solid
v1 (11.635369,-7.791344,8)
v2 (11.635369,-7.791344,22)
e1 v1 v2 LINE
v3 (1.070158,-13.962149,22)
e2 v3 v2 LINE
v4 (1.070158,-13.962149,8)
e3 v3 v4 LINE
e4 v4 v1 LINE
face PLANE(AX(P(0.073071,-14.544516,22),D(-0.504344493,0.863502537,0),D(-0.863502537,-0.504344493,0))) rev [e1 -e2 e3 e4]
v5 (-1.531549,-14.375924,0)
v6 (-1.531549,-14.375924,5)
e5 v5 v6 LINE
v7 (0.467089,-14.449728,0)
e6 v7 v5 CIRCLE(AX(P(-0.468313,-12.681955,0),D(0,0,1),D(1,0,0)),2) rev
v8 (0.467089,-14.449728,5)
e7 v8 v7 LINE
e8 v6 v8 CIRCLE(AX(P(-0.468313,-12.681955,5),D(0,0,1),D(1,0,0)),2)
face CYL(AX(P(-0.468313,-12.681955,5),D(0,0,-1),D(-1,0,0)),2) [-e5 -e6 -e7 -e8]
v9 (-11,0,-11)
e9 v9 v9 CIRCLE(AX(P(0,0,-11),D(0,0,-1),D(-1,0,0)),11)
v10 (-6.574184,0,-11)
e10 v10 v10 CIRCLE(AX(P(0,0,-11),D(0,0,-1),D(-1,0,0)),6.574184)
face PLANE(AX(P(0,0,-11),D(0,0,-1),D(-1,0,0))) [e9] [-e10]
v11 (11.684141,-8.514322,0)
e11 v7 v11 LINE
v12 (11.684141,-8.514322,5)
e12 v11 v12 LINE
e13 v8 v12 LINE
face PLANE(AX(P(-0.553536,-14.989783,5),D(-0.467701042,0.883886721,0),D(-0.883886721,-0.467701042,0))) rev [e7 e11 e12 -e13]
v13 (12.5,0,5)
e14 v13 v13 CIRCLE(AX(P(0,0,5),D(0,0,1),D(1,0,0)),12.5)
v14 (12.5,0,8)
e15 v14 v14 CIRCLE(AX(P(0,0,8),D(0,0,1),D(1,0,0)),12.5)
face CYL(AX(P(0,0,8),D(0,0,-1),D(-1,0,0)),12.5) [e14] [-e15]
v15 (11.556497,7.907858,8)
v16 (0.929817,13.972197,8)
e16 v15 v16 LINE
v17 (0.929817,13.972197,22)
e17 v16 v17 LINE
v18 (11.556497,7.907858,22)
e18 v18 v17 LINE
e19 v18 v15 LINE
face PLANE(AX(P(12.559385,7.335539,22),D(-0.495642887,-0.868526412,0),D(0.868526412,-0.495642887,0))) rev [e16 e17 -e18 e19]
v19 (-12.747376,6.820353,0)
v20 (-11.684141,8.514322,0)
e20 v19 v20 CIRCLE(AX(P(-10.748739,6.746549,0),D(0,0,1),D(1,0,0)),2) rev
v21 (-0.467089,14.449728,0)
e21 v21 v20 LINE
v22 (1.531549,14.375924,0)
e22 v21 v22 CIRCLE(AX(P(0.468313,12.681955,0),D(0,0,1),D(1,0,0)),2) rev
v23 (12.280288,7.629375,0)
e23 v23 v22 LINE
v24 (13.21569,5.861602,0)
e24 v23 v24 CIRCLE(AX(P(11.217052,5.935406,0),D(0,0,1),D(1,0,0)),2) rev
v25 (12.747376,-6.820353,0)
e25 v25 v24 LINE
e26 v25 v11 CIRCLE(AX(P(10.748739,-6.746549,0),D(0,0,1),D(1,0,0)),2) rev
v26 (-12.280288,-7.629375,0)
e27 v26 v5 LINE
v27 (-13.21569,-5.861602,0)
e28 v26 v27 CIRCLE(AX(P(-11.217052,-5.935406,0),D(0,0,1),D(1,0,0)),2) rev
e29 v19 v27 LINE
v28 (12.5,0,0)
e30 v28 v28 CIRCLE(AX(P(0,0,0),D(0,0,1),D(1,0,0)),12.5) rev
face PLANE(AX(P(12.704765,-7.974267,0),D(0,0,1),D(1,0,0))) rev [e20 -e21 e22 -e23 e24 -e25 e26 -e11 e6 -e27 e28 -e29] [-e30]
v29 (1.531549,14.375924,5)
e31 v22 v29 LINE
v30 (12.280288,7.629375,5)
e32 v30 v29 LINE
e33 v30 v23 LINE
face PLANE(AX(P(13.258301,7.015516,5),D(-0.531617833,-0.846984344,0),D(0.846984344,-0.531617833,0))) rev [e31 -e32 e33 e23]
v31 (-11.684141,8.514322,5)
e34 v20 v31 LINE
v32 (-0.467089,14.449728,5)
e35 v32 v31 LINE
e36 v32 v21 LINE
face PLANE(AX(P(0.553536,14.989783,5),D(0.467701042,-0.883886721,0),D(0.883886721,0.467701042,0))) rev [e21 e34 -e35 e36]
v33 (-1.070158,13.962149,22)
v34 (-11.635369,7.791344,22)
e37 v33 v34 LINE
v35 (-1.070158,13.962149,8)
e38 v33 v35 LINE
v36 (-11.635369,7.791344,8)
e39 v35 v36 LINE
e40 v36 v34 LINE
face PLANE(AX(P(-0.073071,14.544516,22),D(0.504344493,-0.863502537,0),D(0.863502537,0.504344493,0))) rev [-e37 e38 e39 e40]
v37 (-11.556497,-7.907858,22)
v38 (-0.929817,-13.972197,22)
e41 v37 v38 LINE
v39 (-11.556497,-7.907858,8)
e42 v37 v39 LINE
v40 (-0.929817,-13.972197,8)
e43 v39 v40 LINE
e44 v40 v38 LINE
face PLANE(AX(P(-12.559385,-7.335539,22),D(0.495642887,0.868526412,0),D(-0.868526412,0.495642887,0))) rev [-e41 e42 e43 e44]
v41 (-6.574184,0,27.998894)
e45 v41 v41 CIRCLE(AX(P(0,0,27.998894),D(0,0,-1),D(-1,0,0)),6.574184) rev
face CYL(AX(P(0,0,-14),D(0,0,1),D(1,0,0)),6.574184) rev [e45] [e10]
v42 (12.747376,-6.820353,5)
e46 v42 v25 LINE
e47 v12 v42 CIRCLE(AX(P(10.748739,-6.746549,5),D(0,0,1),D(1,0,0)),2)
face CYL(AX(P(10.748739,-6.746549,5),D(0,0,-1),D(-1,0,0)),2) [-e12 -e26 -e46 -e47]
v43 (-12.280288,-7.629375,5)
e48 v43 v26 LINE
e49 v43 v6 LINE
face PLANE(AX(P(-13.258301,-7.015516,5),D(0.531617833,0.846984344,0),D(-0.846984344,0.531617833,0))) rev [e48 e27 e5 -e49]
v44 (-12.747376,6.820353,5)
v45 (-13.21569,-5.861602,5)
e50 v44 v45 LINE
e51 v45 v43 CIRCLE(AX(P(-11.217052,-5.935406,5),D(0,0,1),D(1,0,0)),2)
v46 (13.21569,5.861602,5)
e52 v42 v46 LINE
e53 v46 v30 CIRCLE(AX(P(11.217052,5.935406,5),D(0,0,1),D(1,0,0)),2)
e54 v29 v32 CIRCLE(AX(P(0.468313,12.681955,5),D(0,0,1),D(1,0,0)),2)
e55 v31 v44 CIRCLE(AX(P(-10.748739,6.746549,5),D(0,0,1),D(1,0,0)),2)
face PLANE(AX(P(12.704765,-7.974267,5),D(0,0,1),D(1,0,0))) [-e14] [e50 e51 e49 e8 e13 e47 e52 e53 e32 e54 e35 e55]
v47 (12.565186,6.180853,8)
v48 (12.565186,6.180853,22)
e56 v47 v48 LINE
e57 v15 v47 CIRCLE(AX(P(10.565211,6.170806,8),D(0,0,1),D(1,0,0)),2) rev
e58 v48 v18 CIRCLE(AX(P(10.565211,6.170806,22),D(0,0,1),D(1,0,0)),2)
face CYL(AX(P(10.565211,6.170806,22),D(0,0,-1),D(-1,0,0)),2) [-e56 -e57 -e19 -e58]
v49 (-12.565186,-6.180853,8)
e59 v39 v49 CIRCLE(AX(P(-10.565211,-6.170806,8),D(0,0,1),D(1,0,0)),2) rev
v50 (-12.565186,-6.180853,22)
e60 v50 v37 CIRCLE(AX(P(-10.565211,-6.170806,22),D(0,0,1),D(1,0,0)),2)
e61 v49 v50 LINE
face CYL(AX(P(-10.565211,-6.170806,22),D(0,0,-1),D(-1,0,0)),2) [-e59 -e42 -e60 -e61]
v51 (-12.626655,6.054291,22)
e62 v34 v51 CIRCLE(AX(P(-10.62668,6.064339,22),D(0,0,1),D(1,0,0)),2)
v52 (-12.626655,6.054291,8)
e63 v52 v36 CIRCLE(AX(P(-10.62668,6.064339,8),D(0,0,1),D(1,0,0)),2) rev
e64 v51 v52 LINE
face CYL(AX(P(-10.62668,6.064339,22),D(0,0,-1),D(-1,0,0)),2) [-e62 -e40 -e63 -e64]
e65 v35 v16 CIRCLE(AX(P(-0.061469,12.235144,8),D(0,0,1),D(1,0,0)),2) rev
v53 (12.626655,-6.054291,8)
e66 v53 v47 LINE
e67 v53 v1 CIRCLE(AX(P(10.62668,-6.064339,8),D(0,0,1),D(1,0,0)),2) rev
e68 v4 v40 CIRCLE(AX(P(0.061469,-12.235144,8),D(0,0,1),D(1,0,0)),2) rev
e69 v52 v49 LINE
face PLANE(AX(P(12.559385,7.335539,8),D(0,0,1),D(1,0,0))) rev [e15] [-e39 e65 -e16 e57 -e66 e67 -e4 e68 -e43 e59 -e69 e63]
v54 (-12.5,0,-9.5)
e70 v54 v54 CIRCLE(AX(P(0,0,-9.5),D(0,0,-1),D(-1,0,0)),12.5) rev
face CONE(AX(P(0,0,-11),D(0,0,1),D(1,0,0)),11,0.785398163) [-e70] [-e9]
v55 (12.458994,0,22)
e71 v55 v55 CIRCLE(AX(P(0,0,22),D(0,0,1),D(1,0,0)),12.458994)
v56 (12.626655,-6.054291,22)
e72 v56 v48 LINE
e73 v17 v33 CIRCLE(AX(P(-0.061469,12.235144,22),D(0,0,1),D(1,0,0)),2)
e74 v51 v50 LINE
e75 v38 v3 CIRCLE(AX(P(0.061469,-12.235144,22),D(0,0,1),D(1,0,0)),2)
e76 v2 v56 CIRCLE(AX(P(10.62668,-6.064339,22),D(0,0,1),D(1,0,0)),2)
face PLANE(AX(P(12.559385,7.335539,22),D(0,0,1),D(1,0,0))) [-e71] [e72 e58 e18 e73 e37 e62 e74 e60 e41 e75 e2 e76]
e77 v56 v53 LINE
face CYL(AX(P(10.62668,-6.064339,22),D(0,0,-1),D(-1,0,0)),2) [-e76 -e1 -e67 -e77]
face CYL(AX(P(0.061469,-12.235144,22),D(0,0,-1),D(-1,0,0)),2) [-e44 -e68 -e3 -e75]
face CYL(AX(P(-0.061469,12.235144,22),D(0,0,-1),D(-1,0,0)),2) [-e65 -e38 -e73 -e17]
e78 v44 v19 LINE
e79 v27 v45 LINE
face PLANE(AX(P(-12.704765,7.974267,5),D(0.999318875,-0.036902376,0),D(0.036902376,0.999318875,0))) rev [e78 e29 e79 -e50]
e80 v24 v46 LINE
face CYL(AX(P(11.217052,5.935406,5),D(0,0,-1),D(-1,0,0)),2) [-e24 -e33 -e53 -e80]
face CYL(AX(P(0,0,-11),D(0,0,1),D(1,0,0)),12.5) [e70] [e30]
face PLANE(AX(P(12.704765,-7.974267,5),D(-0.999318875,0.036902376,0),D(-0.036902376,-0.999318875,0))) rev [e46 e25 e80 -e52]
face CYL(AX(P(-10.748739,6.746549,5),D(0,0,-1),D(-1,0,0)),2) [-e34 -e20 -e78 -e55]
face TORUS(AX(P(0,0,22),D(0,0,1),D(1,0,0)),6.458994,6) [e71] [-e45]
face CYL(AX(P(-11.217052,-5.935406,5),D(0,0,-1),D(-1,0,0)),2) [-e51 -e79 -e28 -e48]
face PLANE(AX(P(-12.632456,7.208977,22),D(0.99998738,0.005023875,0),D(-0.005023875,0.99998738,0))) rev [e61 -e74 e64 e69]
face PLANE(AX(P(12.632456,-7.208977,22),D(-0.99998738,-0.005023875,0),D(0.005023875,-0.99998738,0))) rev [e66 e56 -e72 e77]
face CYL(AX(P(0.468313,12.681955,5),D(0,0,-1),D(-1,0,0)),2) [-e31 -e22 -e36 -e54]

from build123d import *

# Parameters (mm, degrees)
EXTRUDE_1_DEPTH     = 5
SKETCH_3_R          = 12.5
EXTRUDE_2_DEPTH     = 11
CHAMFER_1_SIZE      = 1.5
EXTRUDE_START       = 3
SKETCH_4_R          = 12.5
EXTRUDE_3_DEPTH     = 3
EXTRUDE_4_DEPTH     = 14
SKETCH_6_R          = 12.458994032
EXTRUDE_5_DEPTH     = 6
FILLET_1_R          = 6
SKETCH_7_R          = 6.574183754
CUT_EXTRUDE_1_DEPTH = 42
FILLET_2_R          = 2


with BuildPart() as part:
    # Эскиз2 → Бобышка-Вытянуть1 (new body)
    with BuildSketch(Plane.XY):
        Polygon((12.704765165, -7.974267497), (13.258300811, 7.015515633), (0.553535647, 14.98978313), (-12.704765165, 7.974267497), (-13.258300811, -7.015515633), (-0.553535647, -14.98978313), align=None)
    extrude(amount=EXTRUDE_1_DEPTH)

    # Эскиз3 → Бобышка-Вытянуть2 (add)
    with BuildSketch(Plane(origin=(0, 0, 0), x_dir=(-1, 0, 0), z_dir=(0, 0, -1))):
        with Locations(Location((0, 0, 0), (0, 0, 180))):
            Circle(SKETCH_3_R)
    extrude(amount=EXTRUDE_2_DEPTH)

    # Фаска1
    chamfer_1_edges = [part.edges().sort_by_distance(p)[0] for p in [
        (-12.5, 0, -11),
    ]]
    chamfer(chamfer_1_edges, length=CHAMFER_1_SIZE)

    # Эскиз4 → Бобышка-Вытянуть3 (add)
    with BuildSketch(Plane.XY.offset(5).offset(EXTRUDE_START)):
        Circle(SKETCH_4_R)
    extrude(amount=-EXTRUDE_3_DEPTH)

    # Эскиз5 → Бобышка-Вытянуть4 (add)
    with BuildSketch(Plane.XY.offset(8)):
        Polygon((12.559385181, 7.335539252), (-0.073070753, 14.544516248), (-12.632455933, 7.208976996), (-12.559385181, -7.335539252), (0.073070753, -14.544516248), (12.632455933, -7.208976996), align=None)
    extrude(amount=EXTRUDE_4_DEPTH)

    # Эскиз6 → Бобышка-Вытянуть5 (add)
    with BuildSketch(Plane.XY.offset(22)):
        Circle(SKETCH_6_R)
    extrude(amount=EXTRUDE_5_DEPTH)

    # Скругление1
    fillet_1_edges = [part.edges().sort_by_distance(p)[0] for p in [
        (-12.458994032, 0, 28),
    ]]
    fillet(fillet_1_edges, radius=FILLET_1_R - 0.0001)  # a hair under: the kernel refuses the full size

    # Эскиз7 → Вырез-Вытянуть1 (cut)
    with BuildSketch(Plane.XY.offset(28)):
        with Locations(Location((0, 0, 0), (0, 0, 180))):
            Circle(SKETCH_7_R)
    extrude(amount=-CUT_EXTRUDE_1_DEPTH, mode=Mode.SUBTRACT)

    # Скругление2
    fillet_2_edges = [part.edges().sort_by_distance(p)[0] for p in [
        (-0.553535647, -14.98978313, 2.5),
        (-13.258300811, -7.015515633, 2.5),
        (-12.704765165, 7.974267497, 2.5),
        (0.553535647, 14.98978313, 2.5),
        (13.258300811, 7.015515633, 2.5),
        (12.704765165, -7.974267497, 2.5),
        (12.632455933, -7.208976996, 15),
        (12.559385181, 7.335539252, 15),
        (-0.073070753, 14.544516248, 15),
        (-12.632455933, 7.208976996, 15),
        (-12.559385181, -7.335539252, 15),
        (0.073070753, -14.544516248, 15),
    ]]
    fillet(fillet_2_edges, radius=FILLET_2_R)


solid = part.part
